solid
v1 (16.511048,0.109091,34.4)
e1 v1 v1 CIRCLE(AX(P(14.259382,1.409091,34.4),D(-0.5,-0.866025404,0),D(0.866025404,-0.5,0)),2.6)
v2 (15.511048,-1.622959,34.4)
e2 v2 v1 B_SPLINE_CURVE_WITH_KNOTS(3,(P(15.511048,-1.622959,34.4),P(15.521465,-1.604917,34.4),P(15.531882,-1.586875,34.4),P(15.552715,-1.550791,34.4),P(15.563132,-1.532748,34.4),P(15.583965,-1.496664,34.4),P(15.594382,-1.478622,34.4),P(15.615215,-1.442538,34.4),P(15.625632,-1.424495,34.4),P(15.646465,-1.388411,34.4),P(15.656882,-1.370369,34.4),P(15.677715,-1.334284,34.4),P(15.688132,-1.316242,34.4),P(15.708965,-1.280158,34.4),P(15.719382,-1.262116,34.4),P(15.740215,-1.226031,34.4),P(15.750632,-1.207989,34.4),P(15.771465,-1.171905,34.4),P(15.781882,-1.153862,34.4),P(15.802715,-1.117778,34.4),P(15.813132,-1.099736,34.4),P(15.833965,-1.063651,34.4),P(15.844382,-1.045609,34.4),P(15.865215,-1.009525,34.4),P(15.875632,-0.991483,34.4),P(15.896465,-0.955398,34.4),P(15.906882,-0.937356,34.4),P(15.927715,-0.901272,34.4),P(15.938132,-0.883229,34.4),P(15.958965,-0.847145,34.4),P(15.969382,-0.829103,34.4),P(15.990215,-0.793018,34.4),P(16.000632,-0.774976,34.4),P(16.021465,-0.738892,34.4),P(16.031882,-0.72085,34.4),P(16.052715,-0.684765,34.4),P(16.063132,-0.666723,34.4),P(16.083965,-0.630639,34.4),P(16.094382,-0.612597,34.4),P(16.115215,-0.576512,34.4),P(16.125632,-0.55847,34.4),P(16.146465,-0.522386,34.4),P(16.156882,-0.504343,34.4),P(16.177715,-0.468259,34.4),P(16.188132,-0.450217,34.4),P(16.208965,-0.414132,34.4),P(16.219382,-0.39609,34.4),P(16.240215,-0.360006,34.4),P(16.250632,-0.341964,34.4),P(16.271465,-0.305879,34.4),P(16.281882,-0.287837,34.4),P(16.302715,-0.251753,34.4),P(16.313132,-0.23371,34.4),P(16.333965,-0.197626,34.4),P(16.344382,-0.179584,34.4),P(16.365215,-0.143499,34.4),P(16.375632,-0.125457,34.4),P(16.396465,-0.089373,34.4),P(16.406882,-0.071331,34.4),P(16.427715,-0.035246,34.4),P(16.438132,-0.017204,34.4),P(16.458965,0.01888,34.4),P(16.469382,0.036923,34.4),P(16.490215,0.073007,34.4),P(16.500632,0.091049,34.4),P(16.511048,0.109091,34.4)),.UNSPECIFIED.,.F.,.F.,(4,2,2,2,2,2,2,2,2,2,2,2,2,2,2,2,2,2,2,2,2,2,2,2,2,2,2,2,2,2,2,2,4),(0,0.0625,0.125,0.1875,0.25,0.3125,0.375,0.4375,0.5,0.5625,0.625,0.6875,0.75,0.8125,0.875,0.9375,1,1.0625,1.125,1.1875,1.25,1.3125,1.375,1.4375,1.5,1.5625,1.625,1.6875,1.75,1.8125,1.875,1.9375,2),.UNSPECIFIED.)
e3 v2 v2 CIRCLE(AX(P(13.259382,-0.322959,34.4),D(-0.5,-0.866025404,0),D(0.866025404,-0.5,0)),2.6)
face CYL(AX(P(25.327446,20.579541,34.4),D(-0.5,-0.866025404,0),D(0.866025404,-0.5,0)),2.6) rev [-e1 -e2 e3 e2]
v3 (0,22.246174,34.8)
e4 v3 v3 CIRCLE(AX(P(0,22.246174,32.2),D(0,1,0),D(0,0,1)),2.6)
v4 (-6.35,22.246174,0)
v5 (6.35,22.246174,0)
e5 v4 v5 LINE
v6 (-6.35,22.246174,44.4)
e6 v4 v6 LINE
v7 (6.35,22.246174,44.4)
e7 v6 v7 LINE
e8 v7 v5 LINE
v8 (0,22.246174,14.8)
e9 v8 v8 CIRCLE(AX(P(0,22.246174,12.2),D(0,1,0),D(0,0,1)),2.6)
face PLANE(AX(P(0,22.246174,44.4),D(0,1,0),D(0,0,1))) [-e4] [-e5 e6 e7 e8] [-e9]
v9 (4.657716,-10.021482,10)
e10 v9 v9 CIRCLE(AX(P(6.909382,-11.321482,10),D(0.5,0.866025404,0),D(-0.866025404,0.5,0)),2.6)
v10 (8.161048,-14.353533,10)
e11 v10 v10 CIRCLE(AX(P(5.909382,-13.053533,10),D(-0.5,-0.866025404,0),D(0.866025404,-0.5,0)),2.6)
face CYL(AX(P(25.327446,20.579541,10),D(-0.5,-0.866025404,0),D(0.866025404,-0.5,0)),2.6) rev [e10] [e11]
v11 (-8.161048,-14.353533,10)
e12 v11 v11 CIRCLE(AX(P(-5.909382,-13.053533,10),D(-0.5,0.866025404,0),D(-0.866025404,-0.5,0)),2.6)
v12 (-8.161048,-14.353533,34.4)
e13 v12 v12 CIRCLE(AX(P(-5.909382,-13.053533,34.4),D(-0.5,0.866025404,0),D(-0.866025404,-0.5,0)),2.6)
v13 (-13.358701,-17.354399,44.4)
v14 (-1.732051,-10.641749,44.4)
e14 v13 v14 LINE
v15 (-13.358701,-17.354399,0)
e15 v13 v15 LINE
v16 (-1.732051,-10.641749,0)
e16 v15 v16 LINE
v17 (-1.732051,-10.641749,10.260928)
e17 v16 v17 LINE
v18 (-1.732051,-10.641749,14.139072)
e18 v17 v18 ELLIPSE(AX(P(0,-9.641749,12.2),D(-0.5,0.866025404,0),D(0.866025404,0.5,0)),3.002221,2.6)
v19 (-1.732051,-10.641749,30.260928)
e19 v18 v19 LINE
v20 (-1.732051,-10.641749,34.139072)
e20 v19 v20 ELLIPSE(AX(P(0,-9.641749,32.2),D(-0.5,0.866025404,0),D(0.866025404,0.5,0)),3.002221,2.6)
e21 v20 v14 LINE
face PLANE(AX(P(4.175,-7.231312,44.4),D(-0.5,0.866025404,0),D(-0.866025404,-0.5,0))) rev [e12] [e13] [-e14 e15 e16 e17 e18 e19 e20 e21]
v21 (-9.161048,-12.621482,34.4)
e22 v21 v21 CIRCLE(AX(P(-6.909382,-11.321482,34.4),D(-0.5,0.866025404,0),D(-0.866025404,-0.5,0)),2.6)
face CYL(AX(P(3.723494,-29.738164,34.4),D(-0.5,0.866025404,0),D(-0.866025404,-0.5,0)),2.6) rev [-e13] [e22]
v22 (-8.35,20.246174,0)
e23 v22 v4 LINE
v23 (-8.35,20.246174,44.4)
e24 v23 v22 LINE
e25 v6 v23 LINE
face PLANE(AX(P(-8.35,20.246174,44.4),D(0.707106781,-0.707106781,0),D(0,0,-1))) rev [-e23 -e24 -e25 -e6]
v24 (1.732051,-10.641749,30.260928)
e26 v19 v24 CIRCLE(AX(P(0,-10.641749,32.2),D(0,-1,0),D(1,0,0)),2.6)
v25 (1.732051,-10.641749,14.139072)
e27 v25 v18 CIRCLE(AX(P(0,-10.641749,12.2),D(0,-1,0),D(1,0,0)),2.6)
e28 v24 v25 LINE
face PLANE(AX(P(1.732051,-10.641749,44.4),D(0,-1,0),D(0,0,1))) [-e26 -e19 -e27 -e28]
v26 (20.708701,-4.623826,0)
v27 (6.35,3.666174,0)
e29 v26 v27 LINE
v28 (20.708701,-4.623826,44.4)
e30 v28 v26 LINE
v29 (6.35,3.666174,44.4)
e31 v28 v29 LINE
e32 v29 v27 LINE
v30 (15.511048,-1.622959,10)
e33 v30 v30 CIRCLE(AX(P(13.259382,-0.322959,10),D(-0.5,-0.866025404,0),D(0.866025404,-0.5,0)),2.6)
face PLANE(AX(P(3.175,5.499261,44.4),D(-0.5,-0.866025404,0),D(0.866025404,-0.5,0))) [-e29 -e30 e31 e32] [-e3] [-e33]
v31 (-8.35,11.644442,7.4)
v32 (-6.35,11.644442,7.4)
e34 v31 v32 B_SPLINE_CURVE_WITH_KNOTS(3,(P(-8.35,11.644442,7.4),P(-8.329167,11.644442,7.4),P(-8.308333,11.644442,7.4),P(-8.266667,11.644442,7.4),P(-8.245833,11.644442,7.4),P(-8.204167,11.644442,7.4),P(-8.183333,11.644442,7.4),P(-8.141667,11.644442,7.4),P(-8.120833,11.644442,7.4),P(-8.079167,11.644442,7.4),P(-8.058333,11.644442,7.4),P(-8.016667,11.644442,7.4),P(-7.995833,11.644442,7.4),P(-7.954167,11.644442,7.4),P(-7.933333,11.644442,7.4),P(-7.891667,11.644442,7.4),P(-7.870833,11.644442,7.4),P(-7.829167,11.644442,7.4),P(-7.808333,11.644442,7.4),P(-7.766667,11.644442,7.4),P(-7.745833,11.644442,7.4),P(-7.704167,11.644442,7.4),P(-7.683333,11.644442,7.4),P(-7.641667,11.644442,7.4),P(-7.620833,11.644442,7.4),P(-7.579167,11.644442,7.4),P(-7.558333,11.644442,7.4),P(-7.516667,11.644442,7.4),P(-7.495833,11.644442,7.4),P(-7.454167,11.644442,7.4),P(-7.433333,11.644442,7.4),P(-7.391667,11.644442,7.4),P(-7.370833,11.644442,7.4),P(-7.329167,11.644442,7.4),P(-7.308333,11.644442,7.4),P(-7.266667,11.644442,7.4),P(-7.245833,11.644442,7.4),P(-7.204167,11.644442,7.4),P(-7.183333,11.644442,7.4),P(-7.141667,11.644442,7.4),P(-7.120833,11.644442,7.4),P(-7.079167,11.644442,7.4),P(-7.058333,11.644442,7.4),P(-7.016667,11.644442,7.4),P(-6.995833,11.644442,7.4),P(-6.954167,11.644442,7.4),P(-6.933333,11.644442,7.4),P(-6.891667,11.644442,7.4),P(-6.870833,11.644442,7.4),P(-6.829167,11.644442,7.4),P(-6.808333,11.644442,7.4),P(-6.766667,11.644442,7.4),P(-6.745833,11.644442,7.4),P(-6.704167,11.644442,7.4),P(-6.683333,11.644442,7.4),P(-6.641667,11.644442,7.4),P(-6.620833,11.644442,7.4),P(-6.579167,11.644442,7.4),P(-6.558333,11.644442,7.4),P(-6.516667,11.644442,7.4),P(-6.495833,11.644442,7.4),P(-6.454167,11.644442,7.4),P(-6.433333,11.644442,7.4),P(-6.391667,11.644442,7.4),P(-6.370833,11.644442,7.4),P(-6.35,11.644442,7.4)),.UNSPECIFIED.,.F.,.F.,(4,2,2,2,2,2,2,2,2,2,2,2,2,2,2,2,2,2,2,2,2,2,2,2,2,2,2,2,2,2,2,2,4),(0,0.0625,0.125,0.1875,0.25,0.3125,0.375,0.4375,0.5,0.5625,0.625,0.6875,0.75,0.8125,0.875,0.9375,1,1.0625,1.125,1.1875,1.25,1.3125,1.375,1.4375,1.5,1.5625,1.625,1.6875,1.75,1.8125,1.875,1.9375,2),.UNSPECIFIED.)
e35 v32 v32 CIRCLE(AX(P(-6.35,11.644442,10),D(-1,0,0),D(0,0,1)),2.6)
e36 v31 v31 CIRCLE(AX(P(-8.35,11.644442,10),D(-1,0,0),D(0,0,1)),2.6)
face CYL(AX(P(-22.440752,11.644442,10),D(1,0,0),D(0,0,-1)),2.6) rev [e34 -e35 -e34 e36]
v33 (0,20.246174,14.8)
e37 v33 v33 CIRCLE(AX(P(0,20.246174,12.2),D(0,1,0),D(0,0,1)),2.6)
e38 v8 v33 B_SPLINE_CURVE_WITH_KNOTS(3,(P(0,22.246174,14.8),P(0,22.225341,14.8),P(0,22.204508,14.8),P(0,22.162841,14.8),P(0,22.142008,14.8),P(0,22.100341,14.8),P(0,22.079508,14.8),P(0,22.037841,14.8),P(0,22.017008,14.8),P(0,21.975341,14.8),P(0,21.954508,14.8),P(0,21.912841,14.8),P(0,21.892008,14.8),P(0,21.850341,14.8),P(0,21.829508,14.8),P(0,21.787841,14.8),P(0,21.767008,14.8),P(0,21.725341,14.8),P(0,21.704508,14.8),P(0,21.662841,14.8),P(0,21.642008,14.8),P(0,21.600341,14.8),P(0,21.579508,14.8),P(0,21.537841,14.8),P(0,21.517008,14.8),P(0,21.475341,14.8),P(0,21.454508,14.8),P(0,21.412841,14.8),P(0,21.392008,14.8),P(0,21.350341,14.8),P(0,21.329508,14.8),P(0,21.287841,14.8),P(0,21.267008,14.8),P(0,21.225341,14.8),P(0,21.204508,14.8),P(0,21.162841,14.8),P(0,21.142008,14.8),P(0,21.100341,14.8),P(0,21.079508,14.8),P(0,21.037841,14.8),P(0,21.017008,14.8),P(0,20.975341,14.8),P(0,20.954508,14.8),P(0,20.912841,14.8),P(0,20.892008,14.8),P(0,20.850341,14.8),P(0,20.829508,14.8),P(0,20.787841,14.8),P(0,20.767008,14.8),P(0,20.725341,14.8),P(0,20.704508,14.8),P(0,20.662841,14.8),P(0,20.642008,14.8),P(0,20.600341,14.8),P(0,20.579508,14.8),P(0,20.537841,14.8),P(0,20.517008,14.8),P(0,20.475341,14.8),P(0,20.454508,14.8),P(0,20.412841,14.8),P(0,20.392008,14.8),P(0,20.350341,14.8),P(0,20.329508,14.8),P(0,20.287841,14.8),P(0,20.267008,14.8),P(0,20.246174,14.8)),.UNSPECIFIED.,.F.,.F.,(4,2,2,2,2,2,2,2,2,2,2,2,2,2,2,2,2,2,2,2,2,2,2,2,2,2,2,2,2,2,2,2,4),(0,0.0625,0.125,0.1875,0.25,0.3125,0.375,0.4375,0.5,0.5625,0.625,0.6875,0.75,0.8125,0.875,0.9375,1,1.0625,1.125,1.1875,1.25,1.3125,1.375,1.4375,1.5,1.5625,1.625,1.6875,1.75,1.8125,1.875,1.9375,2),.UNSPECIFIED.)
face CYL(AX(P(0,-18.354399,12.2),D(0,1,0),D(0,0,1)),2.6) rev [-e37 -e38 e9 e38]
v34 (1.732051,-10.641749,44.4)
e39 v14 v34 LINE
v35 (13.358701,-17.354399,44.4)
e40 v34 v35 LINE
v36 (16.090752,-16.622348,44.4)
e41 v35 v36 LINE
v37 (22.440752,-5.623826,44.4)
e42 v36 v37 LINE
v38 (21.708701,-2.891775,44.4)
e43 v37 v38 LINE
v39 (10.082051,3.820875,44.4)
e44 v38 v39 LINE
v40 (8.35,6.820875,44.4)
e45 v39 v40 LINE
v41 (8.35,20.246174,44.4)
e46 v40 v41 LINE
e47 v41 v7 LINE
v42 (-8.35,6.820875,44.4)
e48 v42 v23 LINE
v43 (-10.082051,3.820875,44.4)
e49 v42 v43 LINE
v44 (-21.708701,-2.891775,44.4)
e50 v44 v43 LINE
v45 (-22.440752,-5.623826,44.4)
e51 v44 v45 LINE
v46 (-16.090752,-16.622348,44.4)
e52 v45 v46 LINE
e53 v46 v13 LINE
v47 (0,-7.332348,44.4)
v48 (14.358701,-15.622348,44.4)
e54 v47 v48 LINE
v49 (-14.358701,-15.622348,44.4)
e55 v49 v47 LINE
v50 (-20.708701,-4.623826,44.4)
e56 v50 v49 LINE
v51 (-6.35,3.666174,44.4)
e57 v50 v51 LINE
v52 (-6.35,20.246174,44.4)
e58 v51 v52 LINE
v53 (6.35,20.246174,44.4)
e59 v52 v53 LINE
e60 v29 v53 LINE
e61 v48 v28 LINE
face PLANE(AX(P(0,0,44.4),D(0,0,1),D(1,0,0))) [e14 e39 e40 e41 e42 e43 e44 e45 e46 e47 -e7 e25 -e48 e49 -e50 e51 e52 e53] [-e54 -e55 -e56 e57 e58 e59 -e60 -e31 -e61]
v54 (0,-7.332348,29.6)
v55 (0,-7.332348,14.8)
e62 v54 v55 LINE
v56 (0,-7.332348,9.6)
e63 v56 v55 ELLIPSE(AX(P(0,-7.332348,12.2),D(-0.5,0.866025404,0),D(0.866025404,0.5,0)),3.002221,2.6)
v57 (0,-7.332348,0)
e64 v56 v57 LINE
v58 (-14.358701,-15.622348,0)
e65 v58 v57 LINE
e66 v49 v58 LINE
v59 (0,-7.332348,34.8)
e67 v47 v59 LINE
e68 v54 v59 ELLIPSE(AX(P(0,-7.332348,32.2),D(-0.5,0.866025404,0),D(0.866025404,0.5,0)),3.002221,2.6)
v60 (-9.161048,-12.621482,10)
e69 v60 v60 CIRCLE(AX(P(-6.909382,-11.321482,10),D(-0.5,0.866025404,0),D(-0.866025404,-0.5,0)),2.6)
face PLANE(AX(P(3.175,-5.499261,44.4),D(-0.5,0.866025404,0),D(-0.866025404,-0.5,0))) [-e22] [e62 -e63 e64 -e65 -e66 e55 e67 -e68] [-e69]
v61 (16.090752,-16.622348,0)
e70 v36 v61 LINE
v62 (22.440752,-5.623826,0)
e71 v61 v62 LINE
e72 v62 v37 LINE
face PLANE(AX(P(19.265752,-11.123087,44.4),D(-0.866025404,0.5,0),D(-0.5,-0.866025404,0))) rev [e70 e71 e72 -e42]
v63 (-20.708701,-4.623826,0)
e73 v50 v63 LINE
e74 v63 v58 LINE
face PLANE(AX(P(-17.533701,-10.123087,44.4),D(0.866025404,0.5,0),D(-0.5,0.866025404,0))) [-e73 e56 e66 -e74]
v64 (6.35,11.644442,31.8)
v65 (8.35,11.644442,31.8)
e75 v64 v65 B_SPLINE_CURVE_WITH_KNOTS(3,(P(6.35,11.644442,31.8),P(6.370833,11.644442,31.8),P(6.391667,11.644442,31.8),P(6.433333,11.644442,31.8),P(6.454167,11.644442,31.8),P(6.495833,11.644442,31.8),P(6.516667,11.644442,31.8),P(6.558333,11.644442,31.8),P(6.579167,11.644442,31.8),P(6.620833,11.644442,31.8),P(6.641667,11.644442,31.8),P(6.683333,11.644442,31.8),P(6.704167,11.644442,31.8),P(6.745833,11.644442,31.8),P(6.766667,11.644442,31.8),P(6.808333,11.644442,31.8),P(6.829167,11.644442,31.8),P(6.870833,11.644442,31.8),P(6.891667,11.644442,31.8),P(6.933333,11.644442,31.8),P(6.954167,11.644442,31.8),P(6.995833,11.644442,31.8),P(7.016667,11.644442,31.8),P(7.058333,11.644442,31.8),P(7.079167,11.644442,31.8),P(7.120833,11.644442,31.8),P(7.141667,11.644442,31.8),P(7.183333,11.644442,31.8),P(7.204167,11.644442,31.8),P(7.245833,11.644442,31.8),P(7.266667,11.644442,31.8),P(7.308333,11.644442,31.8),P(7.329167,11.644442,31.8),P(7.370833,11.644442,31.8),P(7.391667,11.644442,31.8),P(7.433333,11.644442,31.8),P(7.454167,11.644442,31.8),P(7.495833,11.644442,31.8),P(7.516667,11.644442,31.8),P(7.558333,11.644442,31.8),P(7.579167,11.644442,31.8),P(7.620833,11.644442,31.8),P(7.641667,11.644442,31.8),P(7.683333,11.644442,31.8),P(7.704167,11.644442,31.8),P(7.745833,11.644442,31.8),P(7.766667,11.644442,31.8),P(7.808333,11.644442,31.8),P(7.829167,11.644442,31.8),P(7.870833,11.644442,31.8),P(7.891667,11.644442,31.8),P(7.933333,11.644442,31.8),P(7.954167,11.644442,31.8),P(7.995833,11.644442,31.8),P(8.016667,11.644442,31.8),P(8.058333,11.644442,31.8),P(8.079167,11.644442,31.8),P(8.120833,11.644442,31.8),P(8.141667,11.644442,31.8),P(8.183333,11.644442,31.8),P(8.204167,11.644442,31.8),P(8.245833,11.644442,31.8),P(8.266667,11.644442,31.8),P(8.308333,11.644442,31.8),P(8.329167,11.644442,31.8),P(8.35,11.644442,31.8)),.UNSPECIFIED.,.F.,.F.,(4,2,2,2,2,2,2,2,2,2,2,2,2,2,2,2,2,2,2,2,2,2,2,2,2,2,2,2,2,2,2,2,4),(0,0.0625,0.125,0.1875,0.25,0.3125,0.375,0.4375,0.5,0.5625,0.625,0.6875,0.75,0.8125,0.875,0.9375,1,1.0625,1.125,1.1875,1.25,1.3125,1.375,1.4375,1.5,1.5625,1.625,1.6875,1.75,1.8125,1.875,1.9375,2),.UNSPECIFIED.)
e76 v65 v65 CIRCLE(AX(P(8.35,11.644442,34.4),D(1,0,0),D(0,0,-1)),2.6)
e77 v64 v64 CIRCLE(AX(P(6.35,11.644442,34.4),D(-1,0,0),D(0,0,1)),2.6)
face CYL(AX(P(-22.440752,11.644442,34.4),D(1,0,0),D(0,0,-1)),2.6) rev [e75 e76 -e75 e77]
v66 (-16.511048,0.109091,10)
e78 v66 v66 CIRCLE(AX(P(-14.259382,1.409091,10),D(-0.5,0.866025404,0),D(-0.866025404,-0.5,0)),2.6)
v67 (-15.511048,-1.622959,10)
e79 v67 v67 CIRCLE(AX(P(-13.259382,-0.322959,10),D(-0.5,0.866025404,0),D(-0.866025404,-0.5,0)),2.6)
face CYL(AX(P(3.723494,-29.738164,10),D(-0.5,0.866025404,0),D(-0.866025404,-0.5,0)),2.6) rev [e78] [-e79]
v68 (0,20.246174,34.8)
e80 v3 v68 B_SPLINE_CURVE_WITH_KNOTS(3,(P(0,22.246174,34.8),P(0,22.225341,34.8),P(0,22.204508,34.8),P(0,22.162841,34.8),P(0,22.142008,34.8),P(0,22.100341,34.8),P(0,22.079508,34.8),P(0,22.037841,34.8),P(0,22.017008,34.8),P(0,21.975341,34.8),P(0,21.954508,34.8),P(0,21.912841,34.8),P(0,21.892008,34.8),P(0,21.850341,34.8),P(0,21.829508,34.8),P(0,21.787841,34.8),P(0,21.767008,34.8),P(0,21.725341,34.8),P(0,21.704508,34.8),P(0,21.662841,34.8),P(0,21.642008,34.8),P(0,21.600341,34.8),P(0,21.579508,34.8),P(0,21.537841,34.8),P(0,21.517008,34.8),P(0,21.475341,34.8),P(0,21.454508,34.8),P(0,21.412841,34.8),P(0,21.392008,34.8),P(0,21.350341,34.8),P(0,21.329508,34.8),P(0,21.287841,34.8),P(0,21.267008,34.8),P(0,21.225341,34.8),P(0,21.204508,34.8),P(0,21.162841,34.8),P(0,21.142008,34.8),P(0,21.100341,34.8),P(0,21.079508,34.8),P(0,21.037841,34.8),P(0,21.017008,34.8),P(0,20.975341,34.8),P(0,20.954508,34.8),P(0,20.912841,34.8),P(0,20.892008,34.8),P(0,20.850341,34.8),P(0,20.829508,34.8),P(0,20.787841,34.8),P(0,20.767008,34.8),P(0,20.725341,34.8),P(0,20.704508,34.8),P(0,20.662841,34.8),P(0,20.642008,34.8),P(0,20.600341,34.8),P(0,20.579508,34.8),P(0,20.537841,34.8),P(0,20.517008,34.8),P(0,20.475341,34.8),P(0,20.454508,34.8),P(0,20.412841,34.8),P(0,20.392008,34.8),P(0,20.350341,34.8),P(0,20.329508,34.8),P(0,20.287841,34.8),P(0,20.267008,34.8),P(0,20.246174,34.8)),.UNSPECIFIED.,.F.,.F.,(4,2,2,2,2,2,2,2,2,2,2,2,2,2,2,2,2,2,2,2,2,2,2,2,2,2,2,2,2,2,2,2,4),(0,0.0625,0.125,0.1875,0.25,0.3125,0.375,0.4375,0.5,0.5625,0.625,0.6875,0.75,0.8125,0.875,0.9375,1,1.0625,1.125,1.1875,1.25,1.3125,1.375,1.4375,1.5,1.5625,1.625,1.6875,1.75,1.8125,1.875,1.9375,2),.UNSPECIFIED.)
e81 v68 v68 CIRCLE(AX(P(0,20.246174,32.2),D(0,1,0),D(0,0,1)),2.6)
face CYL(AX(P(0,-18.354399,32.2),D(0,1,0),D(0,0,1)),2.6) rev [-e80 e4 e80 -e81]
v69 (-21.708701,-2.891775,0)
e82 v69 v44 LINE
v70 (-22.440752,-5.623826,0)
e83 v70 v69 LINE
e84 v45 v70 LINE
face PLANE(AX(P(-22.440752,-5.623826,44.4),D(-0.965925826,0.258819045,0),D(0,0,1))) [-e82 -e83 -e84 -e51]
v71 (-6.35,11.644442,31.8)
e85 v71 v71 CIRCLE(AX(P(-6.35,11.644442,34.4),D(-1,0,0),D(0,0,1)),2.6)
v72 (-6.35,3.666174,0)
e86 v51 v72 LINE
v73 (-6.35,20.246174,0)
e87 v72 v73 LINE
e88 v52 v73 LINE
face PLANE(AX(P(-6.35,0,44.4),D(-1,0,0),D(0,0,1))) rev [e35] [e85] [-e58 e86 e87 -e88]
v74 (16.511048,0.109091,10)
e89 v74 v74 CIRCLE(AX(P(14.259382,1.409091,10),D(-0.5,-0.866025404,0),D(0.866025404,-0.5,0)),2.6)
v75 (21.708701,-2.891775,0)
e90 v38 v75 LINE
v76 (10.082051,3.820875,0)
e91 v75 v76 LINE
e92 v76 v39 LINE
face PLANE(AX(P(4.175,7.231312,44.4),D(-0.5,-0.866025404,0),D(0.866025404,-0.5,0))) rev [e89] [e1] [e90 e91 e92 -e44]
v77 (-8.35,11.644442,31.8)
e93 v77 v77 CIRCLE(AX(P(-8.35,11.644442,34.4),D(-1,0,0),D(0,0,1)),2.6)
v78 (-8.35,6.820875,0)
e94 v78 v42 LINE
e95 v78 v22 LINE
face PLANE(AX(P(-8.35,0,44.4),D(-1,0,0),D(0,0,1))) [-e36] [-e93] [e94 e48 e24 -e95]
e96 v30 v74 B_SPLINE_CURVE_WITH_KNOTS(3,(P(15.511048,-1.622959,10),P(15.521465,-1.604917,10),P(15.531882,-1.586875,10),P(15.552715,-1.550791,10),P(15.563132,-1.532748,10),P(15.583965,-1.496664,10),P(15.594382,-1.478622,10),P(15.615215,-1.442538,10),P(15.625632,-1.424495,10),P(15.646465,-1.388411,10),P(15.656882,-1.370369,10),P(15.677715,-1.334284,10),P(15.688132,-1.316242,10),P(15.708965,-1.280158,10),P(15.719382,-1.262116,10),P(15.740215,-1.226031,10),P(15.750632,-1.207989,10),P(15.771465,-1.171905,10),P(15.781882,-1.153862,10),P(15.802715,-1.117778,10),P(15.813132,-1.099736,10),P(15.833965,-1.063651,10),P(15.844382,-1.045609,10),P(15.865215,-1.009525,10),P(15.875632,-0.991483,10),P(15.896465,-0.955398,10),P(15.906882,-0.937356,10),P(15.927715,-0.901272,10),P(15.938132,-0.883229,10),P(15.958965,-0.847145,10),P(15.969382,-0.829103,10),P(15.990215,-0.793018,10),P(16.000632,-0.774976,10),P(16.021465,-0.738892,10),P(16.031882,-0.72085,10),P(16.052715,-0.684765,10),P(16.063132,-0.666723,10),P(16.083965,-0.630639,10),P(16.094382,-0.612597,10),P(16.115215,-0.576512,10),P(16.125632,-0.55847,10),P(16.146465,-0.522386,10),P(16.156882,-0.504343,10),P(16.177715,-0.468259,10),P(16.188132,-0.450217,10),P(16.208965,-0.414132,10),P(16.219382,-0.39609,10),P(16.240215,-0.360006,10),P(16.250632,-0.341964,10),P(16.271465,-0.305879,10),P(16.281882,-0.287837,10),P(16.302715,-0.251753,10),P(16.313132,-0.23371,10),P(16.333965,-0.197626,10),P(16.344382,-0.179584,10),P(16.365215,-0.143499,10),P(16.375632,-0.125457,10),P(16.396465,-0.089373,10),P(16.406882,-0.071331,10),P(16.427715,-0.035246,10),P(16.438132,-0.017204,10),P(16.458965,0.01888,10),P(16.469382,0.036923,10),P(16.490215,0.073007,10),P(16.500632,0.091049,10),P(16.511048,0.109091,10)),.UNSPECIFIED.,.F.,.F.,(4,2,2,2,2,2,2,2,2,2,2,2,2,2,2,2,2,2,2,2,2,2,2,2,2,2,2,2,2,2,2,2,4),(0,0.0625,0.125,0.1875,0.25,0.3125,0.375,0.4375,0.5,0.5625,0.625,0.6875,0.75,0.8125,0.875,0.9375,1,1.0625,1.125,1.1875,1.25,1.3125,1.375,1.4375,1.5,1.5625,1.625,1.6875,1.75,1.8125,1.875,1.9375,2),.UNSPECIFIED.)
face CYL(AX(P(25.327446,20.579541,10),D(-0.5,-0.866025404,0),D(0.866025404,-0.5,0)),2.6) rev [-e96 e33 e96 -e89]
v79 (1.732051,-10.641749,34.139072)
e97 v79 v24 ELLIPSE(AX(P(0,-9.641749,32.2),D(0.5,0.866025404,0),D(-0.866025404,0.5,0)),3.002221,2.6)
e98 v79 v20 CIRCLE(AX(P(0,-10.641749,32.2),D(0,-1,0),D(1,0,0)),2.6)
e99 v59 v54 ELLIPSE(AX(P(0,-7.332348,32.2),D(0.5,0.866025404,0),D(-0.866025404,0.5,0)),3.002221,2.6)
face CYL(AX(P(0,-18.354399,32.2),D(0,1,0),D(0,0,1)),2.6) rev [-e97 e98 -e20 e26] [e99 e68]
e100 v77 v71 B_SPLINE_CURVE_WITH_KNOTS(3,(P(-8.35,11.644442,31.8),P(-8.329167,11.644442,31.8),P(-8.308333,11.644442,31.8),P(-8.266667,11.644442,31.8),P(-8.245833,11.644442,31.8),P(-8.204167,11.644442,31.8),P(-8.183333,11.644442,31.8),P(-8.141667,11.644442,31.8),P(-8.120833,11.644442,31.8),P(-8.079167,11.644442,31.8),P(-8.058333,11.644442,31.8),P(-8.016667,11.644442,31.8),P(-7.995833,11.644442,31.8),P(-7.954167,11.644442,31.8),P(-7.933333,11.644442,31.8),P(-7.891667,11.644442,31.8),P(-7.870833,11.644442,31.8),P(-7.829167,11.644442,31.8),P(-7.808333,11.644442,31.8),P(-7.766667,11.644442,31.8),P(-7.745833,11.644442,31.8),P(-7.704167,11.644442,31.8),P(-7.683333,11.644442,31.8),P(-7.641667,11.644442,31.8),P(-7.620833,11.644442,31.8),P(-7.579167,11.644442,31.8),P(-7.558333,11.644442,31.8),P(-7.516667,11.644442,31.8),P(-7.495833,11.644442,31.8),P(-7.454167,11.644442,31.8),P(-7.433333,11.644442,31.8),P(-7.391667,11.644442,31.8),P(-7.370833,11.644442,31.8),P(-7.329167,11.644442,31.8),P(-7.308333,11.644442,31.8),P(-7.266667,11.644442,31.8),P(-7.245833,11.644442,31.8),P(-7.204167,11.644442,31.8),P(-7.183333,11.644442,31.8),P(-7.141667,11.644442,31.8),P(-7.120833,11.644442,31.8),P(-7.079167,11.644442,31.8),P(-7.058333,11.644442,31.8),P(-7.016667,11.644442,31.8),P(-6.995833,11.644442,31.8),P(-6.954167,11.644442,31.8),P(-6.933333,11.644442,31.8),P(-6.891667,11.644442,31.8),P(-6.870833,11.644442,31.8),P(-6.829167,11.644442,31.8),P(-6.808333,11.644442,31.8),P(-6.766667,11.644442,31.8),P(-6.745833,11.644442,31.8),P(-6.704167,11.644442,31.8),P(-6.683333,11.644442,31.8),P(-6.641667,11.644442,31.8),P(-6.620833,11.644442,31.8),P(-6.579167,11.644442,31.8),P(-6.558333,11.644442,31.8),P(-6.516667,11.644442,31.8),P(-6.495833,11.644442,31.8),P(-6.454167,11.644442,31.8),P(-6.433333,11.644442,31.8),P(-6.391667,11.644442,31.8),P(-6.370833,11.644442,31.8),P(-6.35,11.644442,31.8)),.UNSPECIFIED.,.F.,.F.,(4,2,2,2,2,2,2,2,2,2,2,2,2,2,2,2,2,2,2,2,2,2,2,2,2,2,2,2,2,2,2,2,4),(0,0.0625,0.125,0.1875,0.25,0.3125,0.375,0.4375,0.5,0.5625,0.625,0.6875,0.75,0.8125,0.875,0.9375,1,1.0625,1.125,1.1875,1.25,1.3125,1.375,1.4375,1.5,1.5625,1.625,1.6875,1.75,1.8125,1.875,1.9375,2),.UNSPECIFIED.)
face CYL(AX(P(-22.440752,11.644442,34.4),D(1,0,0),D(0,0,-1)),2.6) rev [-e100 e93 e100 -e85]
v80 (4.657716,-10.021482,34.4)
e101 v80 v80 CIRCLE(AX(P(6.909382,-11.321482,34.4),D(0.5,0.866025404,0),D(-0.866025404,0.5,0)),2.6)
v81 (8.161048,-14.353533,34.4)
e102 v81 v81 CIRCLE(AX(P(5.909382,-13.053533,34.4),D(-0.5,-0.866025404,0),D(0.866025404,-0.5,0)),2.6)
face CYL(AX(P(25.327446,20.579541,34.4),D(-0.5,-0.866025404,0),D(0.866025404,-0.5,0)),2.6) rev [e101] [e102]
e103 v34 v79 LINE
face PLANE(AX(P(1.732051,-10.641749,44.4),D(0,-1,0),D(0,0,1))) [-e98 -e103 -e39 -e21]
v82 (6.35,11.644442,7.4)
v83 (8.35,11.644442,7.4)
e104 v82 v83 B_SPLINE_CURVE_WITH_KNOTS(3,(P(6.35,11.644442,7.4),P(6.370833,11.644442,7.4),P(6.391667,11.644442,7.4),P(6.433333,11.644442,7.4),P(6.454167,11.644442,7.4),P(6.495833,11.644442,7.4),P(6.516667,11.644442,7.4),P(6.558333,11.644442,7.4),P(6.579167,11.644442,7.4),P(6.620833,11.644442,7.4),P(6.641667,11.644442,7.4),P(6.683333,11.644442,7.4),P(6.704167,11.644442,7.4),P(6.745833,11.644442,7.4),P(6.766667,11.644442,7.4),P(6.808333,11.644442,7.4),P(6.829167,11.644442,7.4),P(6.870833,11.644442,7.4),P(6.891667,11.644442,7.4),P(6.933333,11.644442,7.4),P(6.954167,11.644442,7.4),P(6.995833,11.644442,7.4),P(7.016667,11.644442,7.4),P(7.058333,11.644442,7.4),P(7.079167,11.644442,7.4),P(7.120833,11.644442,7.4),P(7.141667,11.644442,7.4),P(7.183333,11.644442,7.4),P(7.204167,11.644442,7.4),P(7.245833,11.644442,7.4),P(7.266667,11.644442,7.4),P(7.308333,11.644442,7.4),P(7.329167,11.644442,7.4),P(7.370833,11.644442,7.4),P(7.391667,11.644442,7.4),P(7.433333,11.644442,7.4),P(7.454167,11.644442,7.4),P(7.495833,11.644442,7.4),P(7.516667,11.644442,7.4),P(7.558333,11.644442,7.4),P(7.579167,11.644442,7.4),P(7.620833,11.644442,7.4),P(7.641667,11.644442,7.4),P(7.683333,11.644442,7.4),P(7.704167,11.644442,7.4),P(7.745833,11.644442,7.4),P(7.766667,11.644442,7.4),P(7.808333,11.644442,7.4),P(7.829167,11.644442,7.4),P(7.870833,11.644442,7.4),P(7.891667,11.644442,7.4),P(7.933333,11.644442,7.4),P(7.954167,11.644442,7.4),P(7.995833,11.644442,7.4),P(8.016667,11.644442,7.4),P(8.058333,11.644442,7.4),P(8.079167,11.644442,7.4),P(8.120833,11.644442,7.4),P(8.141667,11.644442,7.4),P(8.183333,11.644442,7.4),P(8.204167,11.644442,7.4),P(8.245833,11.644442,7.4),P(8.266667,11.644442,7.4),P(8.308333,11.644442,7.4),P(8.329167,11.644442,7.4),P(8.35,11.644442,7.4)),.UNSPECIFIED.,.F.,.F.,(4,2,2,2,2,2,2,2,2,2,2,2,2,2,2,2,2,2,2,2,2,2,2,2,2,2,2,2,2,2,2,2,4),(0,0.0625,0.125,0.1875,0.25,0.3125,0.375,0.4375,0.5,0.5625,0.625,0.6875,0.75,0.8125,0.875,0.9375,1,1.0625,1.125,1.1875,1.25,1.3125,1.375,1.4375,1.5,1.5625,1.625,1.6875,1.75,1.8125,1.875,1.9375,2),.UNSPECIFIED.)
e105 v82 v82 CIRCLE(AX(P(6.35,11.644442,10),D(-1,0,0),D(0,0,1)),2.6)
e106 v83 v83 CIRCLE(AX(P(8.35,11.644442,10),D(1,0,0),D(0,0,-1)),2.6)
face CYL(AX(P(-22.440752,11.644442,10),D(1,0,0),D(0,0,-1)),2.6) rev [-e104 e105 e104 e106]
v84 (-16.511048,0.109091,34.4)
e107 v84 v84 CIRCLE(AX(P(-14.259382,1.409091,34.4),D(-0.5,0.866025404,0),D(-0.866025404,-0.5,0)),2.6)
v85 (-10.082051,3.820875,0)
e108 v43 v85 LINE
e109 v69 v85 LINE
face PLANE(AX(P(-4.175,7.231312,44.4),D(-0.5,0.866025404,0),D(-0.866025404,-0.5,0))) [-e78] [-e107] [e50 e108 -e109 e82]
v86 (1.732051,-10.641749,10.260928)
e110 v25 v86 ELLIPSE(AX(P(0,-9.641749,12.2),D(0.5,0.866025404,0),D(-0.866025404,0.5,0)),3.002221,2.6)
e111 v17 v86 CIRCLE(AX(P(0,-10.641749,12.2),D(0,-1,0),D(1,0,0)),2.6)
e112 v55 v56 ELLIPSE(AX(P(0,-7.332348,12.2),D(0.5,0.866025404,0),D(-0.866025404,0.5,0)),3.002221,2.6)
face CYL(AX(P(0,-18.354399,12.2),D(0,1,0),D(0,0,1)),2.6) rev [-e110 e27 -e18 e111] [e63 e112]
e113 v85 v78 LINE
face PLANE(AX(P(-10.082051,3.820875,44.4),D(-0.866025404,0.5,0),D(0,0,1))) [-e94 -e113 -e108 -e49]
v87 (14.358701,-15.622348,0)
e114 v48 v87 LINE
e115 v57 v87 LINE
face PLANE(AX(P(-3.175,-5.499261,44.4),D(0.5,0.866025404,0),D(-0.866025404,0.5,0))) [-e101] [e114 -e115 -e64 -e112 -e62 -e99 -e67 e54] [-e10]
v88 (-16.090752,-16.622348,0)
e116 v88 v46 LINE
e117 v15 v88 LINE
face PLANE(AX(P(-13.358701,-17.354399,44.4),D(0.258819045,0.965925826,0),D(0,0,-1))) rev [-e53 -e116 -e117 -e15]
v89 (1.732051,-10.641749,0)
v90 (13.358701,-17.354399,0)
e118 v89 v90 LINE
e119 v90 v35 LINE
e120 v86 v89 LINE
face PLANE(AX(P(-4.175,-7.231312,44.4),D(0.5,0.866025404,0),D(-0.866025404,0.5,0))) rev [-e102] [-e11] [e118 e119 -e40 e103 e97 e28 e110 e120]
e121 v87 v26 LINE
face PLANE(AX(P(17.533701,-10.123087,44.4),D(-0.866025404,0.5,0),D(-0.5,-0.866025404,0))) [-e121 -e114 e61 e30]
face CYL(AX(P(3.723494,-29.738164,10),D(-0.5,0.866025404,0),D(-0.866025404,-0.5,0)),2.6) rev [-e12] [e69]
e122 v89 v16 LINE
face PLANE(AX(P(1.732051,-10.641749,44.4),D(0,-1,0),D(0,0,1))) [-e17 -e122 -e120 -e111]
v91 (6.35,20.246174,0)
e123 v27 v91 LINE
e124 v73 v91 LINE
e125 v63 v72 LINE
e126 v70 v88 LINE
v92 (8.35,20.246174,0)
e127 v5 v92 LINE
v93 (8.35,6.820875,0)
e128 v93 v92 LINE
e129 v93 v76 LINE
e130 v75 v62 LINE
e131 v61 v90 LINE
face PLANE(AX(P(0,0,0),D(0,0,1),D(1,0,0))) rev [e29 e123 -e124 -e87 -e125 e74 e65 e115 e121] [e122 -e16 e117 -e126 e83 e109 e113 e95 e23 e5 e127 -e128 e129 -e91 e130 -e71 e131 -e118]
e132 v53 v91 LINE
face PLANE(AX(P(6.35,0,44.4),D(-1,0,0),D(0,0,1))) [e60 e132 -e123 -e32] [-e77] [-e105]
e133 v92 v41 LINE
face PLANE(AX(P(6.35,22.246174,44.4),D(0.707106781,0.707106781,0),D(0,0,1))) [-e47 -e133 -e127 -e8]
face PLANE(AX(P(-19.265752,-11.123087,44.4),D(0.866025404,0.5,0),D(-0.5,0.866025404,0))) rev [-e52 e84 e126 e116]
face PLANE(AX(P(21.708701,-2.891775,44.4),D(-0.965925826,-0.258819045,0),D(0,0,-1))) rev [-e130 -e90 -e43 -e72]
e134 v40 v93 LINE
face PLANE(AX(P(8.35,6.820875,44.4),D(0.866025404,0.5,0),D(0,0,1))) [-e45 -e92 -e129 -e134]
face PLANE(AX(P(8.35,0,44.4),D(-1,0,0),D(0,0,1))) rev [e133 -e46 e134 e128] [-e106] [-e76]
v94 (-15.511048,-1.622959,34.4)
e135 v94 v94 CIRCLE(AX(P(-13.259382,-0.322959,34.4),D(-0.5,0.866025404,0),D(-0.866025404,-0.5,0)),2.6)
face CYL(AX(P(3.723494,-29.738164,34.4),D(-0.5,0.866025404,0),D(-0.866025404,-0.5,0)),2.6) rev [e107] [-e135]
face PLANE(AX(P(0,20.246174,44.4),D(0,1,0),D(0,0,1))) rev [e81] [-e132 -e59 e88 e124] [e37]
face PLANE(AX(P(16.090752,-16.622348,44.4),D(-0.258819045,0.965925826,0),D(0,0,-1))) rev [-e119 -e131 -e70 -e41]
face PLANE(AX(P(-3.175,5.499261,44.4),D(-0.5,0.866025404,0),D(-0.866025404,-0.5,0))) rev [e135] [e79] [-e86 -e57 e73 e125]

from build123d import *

# Parameters (mm, degrees)
BOSS_EXTRUDE1_DEPTH = 44.4
SKETCH4_R           = 2.6
CUT_EXTRUDE1_DEPTH  = 59.211840581
SKETCH6_R           = 2.6
CUT_EXTRUDE2_DEPTH  = 65.569616831
CHAMFER1_SIZE       = 2
SKETCH7_R           = 2.6
CUT_EXTRUDE3_DEPTH  = 59.43220581
SKETCH9_R           = 2.6
CUT_EXTRUDE4_DEPTH  = 60.570802035


with BuildPart() as part:
    # Sketch1 → Boss-Extrude1 (new body)
    with BuildSketch(Plane.XY):
        Polygon((-8.35, 22.246174209), (-8.35, 4.820874748), (-23.440752002, -3.891774983), (-15.090752002, -18.354399226), (0, -9.641749495), (15.090752002, -18.354399226), (23.440752002, -3.891774983), (8.35, 4.820874748), (8.35, 22.246174209), align=None)
        Polygon((-20.708701195, -4.623825791), (-6.35, 3.666174209), (-6.35, 20.246174209), (6.35, 20.246174209), (6.35, 3.666174209), (20.708701195, -4.623825791), (14.358701195, -15.622348419), (0, -7.332348419), (-14.358701195, -15.622348419), align=None, mode=Mode.SUBTRACT)
    extrude(amount=BOSS_EXTRUDE1_DEPTH)

    # Sketch4 → Cut-Extrude1 (cut, through all)
    with BuildSketch(Plane(origin=(-4.175, 7.231312122, 0), x_dir=(0.8660254037844606, 0.4999999999999621, 0), z_dir=(-0.4999999999999621, 0.8660254037844606, 0))):
        with Locations((-11.644441584, -10)):
            Circle(SKETCH4_R)
        with Locations((-11.644441584, -34.4)):
            Circle(SKETCH4_R)
    extrude(amount=-CUT_EXTRUDE1_DEPTH, mode=Mode.SUBTRACT)

    # Sketch6 → Cut-Extrude2 (cut, through all)
    with BuildSketch(Plane(origin=(0, 22.246174209, 0), x_dir=(1, 0, 0), z_dir=(0, 1, 0))):
        with Locations((0, -12.2)):
            Circle(SKETCH6_R)
        with Locations((0, -32.2)):
            Circle(SKETCH6_R)
    extrude(amount=-CUT_EXTRUDE2_DEPTH, mode=Mode.SUBTRACT)

    # Chamfer1
    chamfer1_edges = [part.edges().sort_by_distance(p)[0] for p in [
        (-8.35, 4.820874748, 22.2),
        (-8.35, 22.246174209, 22.2),
        (8.35, 22.246174209, 22.2),
        (8.35, 4.820874748, 22.2),
        (23.440752002, -3.891774983, 22.2),
        (0, -9.641749495, 4.8),
        (0, -9.641749495, 22.2),
        (15.090752002, -18.354399226, 22.2),
        (0, -9.641749495, 39.6),
        (-23.440752002, -3.891774983, 22.2),
        (-15.090752002, -18.354399226, 22.2),
    ]]
    chamfer(chamfer1_edges, length=CHAMFER1_SIZE)

    # Sketch7 → Cut-Extrude3 (cut, through all)
    with BuildSketch(Plane(origin=(8.35, 0, 0), x_dir=(0, 0, -1), z_dir=(1, 0, 0))):
        with Locations((-10, 11.644441584)):
            Circle(SKETCH7_R)
        with Locations((-34.4, 11.644441584)):
            Circle(SKETCH7_R)
    extrude(amount=-CUT_EXTRUDE3_DEPTH, mode=Mode.SUBTRACT)

    # Sketch9 → Cut-Extrude4 (cut, through all)
    with BuildSketch(Plane(origin=(-4.175, -7.231312122, 0), x_dir=(0.8660254037844506, -0.49999999999997924, 0), z_dir=(-0.4999999999999793, -0.8660254037844507, 0))):
        with Locations((11.644441584, 34.4)):
            Circle(SKETCH9_R)
        with Locations((11.644441584, 10)):
            Circle(SKETCH9_R)
    extrude(amount=-CUT_EXTRUDE4_DEPTH, mode=Mode.SUBTRACT)


solid = part.part
